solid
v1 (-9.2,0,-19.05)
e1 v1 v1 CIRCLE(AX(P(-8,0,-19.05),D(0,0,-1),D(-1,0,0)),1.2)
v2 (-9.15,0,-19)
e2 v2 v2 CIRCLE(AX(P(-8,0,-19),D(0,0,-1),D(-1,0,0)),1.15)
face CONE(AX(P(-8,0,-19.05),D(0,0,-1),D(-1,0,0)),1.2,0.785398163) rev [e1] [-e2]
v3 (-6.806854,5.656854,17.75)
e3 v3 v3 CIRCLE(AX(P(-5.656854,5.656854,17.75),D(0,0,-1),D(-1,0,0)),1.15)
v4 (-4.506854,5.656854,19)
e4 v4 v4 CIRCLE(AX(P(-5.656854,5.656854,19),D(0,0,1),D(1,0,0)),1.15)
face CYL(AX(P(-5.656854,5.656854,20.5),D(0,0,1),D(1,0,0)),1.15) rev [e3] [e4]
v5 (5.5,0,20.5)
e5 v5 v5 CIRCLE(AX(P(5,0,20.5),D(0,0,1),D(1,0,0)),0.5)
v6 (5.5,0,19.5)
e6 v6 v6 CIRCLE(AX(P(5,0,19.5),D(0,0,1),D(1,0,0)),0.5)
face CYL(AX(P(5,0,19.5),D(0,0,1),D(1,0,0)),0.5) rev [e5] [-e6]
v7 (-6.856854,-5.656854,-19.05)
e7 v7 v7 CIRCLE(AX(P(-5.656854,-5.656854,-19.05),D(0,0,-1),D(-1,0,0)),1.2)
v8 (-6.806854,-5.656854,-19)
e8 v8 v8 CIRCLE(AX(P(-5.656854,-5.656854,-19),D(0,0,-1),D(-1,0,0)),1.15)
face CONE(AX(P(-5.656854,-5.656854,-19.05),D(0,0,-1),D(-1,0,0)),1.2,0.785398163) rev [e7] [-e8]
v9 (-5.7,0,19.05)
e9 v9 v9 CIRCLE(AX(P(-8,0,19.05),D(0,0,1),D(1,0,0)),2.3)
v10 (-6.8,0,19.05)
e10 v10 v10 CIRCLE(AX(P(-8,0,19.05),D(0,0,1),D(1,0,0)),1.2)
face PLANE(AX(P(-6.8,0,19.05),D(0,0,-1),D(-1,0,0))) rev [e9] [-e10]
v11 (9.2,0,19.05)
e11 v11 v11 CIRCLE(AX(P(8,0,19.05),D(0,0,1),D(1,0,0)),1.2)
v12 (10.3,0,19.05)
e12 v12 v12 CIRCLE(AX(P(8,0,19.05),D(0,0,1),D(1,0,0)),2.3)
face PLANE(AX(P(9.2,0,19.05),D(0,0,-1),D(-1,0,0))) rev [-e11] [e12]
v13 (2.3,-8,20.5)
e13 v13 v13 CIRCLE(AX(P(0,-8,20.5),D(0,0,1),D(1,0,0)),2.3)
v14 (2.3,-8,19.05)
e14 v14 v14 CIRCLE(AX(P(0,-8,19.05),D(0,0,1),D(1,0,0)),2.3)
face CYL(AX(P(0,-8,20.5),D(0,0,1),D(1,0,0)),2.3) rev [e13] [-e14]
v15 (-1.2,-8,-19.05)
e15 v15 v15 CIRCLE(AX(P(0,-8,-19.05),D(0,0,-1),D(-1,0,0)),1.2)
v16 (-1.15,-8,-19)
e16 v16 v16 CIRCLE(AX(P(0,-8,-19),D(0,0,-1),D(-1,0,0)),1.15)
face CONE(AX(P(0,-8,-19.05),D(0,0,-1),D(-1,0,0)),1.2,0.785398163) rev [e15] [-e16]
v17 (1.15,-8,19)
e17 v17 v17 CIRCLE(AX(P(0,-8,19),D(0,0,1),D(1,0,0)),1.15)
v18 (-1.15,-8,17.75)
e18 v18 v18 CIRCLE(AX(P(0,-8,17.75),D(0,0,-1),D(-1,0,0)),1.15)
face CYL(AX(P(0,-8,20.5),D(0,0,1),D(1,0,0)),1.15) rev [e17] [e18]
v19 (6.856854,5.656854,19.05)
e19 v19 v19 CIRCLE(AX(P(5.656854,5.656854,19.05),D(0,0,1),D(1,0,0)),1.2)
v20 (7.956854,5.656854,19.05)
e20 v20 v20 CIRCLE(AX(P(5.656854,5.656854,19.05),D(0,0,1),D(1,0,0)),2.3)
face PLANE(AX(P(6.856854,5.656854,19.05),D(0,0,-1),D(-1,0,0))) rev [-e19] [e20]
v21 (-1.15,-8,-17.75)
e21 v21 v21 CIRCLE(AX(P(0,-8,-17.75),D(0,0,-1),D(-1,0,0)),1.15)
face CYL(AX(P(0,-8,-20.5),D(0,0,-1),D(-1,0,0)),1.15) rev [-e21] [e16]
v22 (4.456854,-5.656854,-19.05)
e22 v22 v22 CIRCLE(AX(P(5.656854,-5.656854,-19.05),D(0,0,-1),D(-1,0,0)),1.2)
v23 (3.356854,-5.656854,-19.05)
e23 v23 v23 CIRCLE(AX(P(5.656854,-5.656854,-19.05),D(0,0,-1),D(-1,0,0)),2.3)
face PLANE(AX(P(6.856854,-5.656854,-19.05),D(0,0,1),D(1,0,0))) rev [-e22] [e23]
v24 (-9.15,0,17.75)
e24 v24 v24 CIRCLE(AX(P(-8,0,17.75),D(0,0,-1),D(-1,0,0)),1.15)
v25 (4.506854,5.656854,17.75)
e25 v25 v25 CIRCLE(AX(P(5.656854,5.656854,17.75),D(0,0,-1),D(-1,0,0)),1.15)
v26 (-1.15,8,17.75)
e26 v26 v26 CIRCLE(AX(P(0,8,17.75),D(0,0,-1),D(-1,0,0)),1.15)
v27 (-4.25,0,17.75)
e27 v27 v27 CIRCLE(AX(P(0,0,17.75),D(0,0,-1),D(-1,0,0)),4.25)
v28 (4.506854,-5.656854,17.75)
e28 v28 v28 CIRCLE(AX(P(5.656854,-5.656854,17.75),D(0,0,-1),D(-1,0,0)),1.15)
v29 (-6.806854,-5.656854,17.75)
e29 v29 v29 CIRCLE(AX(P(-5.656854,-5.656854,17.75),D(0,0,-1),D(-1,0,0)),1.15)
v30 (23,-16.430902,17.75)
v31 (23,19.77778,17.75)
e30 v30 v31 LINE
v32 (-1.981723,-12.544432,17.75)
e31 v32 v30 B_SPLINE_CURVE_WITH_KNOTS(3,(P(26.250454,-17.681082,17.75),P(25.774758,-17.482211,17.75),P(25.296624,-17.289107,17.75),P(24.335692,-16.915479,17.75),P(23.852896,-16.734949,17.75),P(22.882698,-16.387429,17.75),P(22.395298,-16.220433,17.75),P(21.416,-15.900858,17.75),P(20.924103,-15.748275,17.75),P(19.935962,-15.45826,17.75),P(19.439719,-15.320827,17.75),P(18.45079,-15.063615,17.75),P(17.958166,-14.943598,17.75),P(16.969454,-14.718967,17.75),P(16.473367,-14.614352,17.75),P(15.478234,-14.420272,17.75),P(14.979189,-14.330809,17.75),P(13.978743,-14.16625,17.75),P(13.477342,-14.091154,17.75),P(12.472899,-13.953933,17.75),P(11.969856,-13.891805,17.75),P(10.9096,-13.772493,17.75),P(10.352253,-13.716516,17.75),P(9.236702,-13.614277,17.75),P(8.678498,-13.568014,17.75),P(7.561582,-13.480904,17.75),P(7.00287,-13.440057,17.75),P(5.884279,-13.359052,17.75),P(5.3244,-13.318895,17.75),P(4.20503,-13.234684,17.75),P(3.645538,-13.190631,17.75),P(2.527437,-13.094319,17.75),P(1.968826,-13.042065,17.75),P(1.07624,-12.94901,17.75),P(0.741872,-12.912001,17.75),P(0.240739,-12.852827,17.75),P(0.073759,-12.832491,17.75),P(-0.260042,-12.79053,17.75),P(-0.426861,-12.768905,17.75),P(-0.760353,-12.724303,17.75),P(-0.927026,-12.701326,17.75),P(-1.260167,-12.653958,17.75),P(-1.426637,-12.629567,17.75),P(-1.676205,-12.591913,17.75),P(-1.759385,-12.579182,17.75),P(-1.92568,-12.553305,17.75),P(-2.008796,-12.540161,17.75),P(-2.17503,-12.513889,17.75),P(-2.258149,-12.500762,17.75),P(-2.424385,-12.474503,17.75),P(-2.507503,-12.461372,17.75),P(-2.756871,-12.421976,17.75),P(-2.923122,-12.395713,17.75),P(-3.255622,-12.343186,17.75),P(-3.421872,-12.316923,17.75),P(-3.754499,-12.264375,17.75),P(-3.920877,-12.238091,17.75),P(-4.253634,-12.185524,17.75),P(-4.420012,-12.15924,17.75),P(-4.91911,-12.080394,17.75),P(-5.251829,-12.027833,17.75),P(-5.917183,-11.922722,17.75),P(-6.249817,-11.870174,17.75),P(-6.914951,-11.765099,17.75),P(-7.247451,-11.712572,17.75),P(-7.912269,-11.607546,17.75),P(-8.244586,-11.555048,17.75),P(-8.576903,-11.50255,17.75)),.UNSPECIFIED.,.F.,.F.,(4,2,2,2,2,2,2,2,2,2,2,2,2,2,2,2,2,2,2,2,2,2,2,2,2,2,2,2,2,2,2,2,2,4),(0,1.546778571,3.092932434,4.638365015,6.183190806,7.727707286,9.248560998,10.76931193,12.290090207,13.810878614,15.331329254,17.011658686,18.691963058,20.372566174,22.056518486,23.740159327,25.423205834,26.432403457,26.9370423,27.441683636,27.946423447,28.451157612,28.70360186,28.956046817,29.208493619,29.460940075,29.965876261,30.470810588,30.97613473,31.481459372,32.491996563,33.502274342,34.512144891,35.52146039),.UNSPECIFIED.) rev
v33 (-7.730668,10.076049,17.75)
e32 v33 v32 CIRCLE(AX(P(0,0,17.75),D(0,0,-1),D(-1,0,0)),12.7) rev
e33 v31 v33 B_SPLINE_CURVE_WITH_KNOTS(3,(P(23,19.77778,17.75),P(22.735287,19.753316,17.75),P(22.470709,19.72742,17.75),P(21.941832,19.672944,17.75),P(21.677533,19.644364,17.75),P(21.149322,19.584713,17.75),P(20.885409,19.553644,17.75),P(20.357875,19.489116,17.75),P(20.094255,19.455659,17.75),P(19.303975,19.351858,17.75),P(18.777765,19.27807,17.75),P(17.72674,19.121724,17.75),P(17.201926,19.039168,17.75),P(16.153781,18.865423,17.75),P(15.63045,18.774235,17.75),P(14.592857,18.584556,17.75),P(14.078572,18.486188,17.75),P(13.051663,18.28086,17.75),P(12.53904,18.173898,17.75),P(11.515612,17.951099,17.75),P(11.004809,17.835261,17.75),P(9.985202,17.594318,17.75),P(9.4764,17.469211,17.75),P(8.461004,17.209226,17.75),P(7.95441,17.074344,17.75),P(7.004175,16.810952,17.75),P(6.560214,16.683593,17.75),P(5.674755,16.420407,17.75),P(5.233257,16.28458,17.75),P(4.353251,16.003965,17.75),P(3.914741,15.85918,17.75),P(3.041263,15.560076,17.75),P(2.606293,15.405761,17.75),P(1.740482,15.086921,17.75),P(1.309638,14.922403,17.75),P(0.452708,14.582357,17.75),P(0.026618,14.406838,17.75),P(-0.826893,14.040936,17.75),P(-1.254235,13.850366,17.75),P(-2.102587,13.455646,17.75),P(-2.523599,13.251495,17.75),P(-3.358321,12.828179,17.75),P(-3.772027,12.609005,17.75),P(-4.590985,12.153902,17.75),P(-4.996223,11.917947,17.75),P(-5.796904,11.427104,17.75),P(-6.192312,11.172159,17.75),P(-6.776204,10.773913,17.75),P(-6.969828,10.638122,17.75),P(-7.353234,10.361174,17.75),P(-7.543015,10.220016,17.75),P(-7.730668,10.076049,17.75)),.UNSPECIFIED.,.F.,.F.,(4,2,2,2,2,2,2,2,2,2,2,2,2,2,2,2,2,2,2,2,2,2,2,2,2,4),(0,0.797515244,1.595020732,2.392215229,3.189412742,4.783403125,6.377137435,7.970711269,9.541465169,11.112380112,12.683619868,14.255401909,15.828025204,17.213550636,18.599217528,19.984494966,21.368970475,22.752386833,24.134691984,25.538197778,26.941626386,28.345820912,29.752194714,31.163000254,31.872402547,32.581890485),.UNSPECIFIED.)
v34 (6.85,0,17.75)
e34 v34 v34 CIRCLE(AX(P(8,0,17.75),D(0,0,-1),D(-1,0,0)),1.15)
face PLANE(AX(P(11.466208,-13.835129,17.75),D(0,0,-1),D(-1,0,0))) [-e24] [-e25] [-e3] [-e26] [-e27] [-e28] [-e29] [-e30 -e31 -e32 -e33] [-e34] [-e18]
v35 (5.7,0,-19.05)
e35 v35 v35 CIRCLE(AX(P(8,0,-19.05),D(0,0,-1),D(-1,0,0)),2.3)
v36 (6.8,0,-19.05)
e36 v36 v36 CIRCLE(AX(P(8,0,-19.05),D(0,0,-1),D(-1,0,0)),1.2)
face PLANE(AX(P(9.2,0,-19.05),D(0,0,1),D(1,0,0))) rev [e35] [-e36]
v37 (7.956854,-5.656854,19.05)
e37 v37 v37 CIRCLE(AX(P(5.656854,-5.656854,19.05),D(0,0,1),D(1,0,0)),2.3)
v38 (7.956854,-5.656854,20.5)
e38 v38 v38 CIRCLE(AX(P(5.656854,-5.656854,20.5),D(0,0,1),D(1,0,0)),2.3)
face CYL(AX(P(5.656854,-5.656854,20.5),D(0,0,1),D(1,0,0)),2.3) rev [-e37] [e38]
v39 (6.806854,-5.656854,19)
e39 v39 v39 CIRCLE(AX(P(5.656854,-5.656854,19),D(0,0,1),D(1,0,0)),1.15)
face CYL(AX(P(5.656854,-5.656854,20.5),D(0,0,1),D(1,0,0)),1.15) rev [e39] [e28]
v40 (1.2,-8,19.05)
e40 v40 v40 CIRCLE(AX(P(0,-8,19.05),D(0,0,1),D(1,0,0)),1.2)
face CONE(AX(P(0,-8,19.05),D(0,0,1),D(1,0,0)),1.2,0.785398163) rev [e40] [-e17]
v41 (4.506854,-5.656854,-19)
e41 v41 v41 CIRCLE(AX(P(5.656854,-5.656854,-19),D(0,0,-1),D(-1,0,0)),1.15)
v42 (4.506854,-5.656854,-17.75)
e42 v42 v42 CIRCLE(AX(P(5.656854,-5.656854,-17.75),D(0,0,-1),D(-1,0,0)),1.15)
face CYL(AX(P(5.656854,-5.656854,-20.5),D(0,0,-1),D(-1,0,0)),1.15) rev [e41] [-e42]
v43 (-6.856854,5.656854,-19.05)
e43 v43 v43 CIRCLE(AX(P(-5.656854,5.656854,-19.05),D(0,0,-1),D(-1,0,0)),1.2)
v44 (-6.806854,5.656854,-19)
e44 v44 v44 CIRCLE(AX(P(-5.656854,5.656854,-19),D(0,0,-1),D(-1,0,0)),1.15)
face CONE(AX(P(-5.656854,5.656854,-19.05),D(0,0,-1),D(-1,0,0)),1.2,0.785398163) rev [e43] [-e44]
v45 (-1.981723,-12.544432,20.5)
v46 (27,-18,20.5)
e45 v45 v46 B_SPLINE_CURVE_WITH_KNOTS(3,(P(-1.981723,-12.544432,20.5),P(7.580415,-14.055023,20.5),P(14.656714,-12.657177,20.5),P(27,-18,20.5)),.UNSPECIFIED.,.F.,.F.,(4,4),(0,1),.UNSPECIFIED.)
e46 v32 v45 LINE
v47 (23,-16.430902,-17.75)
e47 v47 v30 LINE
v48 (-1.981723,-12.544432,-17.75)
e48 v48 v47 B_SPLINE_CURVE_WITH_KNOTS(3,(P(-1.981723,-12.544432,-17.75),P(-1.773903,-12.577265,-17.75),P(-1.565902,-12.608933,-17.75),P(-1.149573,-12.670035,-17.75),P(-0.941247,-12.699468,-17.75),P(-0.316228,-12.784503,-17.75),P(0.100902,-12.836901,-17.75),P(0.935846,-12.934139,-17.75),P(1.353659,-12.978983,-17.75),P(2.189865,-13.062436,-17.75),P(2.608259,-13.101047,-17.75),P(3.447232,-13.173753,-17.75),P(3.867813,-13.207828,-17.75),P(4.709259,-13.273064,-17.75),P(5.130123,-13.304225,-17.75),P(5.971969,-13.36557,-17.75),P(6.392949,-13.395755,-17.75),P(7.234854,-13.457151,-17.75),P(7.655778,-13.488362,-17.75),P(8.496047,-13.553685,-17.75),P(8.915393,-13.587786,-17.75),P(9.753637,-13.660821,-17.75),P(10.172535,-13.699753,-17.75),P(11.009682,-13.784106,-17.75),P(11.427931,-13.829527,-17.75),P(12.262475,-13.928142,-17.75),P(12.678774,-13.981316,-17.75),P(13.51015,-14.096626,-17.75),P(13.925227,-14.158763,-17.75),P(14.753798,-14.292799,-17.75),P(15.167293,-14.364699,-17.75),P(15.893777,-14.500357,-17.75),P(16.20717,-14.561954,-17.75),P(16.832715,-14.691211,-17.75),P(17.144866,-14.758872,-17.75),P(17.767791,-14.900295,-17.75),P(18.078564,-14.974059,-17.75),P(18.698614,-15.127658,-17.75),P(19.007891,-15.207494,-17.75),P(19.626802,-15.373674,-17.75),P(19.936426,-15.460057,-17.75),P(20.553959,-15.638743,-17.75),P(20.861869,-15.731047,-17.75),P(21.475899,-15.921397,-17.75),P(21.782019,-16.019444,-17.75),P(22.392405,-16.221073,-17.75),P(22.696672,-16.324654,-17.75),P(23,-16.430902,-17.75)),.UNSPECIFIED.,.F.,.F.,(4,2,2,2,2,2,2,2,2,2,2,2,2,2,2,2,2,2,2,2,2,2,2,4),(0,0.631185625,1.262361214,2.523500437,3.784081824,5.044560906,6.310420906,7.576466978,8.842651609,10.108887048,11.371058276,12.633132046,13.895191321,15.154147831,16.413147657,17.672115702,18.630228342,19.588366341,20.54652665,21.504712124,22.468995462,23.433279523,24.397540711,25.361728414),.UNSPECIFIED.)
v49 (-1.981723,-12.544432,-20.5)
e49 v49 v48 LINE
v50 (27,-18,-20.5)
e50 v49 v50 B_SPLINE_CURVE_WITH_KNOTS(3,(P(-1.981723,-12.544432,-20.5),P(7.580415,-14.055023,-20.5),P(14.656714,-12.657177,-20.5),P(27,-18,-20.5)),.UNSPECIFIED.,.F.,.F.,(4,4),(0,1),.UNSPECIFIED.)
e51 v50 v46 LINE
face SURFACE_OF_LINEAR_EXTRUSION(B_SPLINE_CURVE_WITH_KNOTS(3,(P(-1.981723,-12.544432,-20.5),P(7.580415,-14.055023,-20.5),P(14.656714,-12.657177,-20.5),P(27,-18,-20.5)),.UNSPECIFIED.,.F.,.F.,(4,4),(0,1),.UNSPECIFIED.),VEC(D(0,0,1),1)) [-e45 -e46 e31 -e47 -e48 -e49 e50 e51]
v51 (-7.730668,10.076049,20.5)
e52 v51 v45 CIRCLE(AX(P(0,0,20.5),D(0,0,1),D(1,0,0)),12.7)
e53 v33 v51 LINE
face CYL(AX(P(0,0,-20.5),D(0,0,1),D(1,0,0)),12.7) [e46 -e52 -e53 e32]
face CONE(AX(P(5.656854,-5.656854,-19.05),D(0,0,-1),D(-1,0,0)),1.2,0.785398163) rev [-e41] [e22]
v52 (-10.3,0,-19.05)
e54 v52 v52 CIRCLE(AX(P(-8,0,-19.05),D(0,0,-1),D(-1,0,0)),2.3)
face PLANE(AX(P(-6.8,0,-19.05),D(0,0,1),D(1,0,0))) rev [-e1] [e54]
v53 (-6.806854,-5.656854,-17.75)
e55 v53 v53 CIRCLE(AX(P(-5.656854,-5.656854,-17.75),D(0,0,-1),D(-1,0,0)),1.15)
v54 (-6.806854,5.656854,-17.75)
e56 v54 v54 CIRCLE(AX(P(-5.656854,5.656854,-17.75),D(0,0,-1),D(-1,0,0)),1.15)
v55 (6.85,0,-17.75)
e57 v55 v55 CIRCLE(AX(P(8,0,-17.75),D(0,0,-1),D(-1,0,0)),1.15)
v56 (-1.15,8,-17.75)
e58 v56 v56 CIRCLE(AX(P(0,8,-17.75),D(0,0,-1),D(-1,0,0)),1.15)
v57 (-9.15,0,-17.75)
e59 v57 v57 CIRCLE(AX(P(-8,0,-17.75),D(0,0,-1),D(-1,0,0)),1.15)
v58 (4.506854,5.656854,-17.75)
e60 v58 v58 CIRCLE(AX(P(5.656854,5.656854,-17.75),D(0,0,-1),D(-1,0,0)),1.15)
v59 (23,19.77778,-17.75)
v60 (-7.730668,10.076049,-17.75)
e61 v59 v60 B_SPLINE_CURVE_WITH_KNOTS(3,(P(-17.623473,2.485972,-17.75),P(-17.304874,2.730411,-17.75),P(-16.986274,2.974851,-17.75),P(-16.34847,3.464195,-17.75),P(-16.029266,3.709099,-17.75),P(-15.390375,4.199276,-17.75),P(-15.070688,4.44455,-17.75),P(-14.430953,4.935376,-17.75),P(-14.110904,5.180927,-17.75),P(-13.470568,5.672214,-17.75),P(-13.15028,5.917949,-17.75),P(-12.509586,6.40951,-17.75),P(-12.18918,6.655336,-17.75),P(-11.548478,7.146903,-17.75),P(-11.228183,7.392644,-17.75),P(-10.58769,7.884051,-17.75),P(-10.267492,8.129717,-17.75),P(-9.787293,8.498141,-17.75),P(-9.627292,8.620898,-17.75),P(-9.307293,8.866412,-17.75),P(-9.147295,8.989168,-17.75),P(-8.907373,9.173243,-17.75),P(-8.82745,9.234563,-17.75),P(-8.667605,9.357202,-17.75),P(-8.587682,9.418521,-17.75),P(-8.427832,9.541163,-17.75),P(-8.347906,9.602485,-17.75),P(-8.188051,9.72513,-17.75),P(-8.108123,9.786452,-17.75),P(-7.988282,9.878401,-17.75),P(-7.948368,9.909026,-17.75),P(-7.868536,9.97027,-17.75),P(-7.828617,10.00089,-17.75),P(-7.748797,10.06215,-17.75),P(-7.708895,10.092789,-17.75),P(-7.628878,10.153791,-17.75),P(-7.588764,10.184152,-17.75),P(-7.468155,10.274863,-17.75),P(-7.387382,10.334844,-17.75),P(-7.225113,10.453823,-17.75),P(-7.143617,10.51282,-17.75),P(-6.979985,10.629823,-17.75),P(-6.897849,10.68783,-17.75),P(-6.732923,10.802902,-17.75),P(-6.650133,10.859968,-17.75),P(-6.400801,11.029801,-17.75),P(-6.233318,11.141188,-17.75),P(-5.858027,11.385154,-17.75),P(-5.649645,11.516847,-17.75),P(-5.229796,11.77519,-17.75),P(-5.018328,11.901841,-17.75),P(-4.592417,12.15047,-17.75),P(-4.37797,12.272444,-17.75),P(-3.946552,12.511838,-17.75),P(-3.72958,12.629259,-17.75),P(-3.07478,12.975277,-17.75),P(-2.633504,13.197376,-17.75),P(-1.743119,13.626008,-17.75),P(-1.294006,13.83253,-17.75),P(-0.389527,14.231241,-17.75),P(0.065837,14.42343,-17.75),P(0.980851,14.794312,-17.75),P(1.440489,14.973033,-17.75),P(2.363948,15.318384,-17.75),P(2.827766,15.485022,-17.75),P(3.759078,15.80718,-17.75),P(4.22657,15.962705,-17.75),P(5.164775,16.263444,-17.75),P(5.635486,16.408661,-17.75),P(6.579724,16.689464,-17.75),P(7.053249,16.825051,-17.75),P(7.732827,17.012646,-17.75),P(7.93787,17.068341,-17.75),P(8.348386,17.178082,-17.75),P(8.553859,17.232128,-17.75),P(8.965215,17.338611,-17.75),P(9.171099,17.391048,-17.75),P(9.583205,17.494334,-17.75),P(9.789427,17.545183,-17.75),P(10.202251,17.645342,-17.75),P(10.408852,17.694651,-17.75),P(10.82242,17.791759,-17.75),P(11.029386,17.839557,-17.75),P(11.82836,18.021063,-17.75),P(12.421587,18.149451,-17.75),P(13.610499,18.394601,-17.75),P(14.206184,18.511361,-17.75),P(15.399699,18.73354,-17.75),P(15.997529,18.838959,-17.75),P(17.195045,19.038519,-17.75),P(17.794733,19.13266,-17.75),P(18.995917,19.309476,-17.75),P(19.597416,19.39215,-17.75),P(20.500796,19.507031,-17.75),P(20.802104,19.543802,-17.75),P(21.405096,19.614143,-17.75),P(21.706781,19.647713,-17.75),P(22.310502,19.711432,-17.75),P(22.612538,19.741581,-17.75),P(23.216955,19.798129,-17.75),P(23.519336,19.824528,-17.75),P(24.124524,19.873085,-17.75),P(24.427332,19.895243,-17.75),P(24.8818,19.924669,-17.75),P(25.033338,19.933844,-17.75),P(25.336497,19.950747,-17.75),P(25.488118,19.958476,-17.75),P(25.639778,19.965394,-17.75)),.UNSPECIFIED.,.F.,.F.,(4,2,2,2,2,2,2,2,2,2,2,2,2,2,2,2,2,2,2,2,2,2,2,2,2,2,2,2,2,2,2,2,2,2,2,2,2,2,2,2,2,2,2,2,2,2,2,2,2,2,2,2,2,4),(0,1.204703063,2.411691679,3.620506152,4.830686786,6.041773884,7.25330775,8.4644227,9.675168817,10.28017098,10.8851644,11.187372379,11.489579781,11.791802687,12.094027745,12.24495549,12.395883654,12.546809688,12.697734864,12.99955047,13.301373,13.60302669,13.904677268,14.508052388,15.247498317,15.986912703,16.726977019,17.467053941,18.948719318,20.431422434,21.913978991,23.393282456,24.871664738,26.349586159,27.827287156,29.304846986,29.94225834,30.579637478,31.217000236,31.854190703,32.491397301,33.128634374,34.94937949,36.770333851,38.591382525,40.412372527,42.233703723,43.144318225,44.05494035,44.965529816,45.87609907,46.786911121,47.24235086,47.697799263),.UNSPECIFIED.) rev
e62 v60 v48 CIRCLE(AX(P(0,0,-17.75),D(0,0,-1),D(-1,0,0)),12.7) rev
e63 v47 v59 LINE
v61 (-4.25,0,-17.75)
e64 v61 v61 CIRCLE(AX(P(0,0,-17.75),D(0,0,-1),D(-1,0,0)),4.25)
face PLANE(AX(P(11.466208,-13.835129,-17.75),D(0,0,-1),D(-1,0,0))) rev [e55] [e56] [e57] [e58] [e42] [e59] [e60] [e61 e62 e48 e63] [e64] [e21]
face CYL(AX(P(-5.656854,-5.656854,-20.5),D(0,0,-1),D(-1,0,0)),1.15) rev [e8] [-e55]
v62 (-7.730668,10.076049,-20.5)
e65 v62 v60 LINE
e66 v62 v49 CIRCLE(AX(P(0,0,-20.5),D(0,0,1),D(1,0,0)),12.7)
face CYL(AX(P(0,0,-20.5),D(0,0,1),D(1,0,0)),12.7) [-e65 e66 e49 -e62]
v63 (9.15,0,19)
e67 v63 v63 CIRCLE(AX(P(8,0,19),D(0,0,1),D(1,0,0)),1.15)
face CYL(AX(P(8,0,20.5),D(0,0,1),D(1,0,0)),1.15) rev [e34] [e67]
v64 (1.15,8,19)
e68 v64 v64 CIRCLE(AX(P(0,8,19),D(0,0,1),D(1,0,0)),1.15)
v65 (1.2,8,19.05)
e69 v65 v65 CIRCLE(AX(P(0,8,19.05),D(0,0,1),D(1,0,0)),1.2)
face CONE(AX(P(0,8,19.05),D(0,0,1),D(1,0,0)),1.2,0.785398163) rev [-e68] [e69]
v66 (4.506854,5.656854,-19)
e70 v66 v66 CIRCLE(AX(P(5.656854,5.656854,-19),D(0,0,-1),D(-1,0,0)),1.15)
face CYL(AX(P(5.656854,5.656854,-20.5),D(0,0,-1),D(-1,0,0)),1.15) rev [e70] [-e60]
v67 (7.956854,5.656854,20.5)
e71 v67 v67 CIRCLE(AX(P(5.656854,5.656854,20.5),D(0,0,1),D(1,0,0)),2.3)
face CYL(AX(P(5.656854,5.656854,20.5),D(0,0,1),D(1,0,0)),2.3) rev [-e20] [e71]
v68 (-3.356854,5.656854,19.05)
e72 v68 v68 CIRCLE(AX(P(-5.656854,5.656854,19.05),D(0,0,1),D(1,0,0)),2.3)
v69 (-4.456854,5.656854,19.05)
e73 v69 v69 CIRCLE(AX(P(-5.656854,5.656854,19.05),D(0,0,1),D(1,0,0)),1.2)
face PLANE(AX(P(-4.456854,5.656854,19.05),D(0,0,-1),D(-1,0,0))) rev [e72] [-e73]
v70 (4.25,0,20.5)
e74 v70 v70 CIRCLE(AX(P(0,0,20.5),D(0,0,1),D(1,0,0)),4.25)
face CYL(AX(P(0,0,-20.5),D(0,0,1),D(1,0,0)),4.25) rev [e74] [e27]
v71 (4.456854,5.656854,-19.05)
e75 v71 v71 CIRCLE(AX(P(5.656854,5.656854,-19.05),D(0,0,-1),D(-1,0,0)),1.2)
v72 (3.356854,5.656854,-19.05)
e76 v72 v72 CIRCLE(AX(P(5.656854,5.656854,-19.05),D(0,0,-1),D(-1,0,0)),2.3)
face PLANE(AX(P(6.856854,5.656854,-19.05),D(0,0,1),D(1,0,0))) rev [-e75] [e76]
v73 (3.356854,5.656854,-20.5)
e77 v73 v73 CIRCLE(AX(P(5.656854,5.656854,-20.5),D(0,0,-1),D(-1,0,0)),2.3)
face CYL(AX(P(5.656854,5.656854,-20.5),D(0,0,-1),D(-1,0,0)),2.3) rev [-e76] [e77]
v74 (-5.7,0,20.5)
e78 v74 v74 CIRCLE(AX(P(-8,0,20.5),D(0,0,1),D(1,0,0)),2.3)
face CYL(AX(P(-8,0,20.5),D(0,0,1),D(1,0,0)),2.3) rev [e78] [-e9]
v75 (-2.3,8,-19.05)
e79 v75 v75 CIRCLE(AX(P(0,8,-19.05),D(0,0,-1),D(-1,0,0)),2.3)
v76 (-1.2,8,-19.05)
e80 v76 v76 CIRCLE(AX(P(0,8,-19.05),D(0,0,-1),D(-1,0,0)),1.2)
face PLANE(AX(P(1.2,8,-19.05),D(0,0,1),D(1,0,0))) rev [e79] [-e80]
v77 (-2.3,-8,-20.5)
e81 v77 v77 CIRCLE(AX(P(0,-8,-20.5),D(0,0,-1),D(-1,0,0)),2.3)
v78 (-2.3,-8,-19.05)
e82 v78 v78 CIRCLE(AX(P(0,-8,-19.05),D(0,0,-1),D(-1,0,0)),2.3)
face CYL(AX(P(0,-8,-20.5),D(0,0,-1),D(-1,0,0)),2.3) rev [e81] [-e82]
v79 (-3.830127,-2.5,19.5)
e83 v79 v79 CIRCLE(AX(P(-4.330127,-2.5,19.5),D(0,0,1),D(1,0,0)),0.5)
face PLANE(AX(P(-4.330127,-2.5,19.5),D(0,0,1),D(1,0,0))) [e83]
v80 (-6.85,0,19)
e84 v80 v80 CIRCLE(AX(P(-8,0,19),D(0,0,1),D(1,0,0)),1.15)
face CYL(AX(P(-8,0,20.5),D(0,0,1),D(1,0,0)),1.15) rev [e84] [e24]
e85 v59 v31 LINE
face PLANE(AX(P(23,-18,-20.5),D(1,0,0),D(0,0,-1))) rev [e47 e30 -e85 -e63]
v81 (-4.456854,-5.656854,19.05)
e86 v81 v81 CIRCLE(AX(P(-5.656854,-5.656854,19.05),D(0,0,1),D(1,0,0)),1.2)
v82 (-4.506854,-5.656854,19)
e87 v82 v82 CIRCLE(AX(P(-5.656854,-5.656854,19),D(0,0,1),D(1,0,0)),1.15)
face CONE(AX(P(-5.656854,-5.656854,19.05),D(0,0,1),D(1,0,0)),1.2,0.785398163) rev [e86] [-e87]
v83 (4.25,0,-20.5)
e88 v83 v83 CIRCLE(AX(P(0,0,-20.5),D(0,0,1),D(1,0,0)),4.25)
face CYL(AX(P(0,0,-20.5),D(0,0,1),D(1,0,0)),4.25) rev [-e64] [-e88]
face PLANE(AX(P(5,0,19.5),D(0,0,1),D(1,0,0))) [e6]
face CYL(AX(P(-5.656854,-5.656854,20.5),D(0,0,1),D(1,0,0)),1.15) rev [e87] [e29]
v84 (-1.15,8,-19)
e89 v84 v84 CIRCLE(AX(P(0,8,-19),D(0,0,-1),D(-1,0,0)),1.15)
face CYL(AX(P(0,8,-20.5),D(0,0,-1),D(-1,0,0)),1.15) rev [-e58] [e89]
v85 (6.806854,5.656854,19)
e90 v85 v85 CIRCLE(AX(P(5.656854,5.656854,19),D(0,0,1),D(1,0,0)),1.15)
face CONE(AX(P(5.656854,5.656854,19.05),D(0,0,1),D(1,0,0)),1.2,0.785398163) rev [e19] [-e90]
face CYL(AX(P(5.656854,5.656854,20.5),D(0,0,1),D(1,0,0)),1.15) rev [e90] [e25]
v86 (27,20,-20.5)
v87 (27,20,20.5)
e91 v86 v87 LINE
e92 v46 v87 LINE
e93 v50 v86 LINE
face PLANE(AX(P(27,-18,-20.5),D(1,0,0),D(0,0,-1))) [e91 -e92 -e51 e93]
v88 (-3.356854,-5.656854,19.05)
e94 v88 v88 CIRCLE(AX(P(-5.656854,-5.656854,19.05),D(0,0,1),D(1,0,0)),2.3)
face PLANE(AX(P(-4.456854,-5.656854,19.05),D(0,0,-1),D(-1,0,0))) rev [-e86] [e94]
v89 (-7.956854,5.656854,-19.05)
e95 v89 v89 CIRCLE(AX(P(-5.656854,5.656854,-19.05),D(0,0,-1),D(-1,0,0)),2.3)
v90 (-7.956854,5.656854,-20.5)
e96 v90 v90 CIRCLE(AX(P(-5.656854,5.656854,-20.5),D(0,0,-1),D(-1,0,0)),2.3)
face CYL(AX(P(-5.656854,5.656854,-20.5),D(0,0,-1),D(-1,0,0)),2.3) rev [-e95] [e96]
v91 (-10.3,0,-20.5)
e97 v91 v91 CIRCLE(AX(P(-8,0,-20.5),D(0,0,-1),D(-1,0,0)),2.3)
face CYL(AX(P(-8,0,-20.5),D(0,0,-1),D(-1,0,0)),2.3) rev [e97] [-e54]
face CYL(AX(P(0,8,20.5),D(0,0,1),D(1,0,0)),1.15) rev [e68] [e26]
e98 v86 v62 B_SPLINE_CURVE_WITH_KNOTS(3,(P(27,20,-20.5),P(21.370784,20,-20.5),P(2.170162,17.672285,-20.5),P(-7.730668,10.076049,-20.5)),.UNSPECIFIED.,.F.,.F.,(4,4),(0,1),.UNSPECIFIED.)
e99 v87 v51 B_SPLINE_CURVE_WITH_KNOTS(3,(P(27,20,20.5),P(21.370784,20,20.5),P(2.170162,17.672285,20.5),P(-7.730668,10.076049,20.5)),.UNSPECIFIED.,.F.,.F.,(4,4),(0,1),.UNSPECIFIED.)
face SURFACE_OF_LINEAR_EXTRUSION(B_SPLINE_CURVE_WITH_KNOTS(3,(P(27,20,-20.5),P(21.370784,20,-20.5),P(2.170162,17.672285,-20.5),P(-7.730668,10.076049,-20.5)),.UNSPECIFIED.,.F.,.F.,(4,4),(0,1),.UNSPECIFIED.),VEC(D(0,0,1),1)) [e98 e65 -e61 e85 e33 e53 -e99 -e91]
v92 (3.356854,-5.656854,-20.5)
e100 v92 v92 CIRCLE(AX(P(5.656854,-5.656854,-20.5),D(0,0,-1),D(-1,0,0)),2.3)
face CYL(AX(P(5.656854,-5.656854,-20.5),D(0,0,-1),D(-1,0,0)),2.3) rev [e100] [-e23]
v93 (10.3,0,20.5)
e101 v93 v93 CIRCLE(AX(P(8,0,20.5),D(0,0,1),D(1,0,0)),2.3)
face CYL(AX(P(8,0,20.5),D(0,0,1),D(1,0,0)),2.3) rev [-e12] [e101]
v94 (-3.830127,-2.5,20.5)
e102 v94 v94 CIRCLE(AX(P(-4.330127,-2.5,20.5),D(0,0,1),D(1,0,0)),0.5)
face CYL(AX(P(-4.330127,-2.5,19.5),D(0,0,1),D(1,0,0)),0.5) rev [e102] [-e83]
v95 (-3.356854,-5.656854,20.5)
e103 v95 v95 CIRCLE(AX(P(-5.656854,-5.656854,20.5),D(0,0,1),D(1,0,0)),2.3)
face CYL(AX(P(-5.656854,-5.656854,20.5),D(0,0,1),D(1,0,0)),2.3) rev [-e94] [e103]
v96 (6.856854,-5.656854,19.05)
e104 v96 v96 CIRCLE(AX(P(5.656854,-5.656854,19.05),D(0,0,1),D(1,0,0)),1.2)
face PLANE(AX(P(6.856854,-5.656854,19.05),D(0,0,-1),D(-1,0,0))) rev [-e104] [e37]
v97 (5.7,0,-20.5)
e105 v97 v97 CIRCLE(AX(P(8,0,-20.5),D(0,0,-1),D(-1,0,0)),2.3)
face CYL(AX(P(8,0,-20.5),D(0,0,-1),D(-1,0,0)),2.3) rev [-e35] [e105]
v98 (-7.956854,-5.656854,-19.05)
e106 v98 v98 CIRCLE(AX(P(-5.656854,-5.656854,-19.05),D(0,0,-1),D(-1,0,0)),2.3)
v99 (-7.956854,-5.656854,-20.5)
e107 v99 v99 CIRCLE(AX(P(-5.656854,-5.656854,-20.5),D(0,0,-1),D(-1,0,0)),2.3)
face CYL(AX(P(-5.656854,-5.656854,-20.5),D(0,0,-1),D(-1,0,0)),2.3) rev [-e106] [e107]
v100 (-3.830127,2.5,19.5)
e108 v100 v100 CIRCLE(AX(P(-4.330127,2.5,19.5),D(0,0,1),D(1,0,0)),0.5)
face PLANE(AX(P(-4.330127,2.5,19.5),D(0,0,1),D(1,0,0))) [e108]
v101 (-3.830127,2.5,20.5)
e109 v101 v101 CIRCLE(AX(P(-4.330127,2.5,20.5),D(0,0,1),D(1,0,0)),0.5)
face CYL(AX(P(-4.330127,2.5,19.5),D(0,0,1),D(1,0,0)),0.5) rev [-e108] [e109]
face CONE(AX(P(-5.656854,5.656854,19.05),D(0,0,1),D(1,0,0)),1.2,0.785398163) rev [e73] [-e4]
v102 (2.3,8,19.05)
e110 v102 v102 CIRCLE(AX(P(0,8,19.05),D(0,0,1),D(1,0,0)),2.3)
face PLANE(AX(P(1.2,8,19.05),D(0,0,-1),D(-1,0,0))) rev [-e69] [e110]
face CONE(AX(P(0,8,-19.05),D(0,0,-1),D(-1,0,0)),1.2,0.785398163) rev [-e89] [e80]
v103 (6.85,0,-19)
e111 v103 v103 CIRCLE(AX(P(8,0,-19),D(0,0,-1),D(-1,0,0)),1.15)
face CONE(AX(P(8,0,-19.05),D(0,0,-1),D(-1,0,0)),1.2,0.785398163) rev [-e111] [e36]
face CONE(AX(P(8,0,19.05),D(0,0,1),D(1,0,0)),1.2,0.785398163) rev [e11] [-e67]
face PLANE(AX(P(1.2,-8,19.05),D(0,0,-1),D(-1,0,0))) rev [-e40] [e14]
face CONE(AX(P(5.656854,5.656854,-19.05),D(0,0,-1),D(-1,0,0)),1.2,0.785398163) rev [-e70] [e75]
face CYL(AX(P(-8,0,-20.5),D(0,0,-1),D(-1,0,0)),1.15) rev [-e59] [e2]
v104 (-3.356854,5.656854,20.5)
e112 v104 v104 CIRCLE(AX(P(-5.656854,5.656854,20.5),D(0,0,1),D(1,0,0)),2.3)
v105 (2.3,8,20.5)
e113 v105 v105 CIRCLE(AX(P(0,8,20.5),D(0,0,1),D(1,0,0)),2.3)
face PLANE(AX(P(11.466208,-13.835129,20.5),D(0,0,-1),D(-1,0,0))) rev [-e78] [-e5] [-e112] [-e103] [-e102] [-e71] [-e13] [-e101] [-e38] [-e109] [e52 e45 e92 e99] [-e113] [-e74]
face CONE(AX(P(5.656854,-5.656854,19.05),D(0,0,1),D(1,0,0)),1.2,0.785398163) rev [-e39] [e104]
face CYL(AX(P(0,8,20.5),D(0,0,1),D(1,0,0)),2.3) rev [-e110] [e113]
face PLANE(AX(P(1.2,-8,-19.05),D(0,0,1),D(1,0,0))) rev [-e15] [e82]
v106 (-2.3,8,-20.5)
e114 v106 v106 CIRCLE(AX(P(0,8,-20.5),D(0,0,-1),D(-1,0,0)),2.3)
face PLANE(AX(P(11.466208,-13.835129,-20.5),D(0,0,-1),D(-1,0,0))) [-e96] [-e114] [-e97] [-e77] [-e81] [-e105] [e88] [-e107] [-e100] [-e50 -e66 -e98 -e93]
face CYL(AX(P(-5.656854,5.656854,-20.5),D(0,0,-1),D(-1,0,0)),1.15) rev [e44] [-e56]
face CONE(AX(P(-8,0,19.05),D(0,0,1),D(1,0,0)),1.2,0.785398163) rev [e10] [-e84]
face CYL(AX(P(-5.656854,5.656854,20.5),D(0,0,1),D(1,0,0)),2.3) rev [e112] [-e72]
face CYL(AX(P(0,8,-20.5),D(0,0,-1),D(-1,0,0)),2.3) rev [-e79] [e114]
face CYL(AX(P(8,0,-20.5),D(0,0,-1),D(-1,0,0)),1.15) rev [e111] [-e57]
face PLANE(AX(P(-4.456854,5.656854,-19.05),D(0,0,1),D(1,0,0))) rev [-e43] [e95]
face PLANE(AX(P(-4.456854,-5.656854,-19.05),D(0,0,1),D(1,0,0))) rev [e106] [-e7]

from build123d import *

# Parameters (mm, degrees)
BOSS_EXTRUDE1_DEPTH      = 20.5
SHELL1_START             = -12.7000001
SHELL1_OUTLINE_W         = 39
SHELL1_OUTLINE_H         = 35.5
SHELL1_DEPTH             = 35.7000001
SKETCH27_R               = 0.5
CUT_EXTRUDE10_DEPTH      = 1
CUT_EXTRUDE17_DEPTH      = 40.36051338
CUT_EXTRUDE17_DEPTH_BACK = 40.36051338
SKETCH35_R               = 4.25


# Read off the part's stored shape, not the designer's step: Shell1, CBORE for M2 Hex Socket Head Cap Screw2
with BuildPart() as part:
    # Sketch4 → Boss-Extrude1 (new, symmetric)
    with BuildSketch(Plane.XY):
        with BuildLine():
            Line((27, -18), (27, 20))
            add(Edge.make_bspline(
                [(-7.730668476, 10.076049072), (2.170162487, 17.672284588), (21.370784375, 20), (27, 20)],
                knots=[0, 0, 0, 0, 1, 1, 1, 1], degree=3))
            ThreePointArc((-7.730668476, 10.076049072), (-12.308703382, -3.128229699), (-1.981723336, -12.544431937))
            add(Edge.make_bspline(
                [(-1.981723336, -12.544431937), (7.580415063, -14.055023481), (14.656713895, -12.657176609), (27, -18)],
                knots=[0, 0, 0, 0, 1, 1, 1, 1], degree=3))
        make_face()
    extrude(amount=BOSS_EXTRUDE1_DEPTH, both=True)

    # Shell1 outline → Shell1 (cut)
    with BuildSketch(Plane.YZ.offset(SHELL1_START)):
        with Locations((1.5, 0)):
            Rectangle(SHELL1_OUTLINE_W, SHELL1_OUTLINE_H)
    extrude(amount=SHELL1_DEPTH, mode=Mode.SUBTRACT)

    # CBORE for M2 Hex Socket Head Cap Scr 2 → CBORE for M2 Hex Socket Head Cap Screw2 (revolve, cut)
    with BuildSketch(Plane(origin=(-5.656854249, -5.656854249, 0), x_dir=(1, 0, 0), z_dir=(0, -1, 0))):
        Polygon((0, 17.75), (1.15, 17.75), (1.15, 19), (1.2, 19.05), (2.3, 19.05), (2.3, 20.5), (0, 20.5), align=None)
    cbore_for_m2_hex_socket_head_cap_screw2 = revolve(axis=Axis((-5.656854249, -5.656854249, 0), (0, 0, 1)), mode=Mode.SUBTRACT)

    # CBORE for M2 Hex Socket Head Cap Scr 3 o → CBORE for M2 Hex Socket Head Cap Scr 3 (revolve, cut)
    with BuildSketch(Plane(origin=(-8, 0, 0), x_dir=(1, 0, 0), z_dir=(0, -1, 0))):
        Polygon((1.15, 19), (1.2, 19.05), (2.3, 19.05), (2.3, 20.5), (0, 20.5), (0, 17.75), (1.15, 17.75), align=None)
    cbore_for_m2_hex_socket_head_cap_scr_3 = revolve(axis=Axis((-8, 0, 0), (0, 0, 1)), mode=Mode.SUBTRACT)

    # CBORE for M2 Hex Socket Head Cap Scr 4 o → CBORE for M2 Hex Socket Head Cap Scr 4 (revolve, cut)
    with BuildSketch(Plane(origin=(-5.656854249, 5.656854249, 0), x_dir=(1, 0, 0), z_dir=(0, -1, 0))):
        Polygon((1.15, 19), (1.2, 19.05), (2.3, 19.05), (2.3, 20.5), (0, 20.5), (0, 17.75), (1.15, 17.75), align=None)
    cbore_for_m2_hex_socket_head_cap_scr_4 = revolve(axis=Axis((-5.656854249, 5.656854249, 0), (0, 0, 1)), mode=Mode.SUBTRACT)

    # CBORE for M2 Hex Socket Head Cap Scr 5 o → CBORE for M2 Hex Socket Head Cap Scr 5 (revolve, cut)
    with BuildSketch(Plane(origin=(8, 0, 0), x_dir=(1, 0, 0), z_dir=(0, -1, 0))):
        Polygon((1.15, 19), (1.2, 19.05), (2.3, 19.05), (2.3, 20.5), (0, 20.5), (0, 17.75), (1.15, 17.75), align=None)
    cbore_for_m2_hex_socket_head_cap_scr_5 = revolve(axis=Axis((8, 0, 0), (0, 0, 1)), mode=Mode.SUBTRACT)

    # CBORE for M2 Hex Socket Head Cap Scr 6 o → CBORE for M2 Hex Socket Head Cap Scr 6 (revolve, cut)
    with BuildSketch(Plane(origin=(5.656854249, -5.656854249, 0), x_dir=(1, 0, 0), z_dir=(0, -1, 0))):
        Polygon((1.15, 19), (1.2, 19.05), (2.3, 19.05), (2.3, 20.5), (0, 20.5), (0, 17.75), (1.15, 17.75), align=None)
    cbore_for_m2_hex_socket_head_cap_scr_6 = revolve(axis=Axis((5.656854249, -5.656854249, 0), (0, 0, 1)), mode=Mode.SUBTRACT)

    # CBORE for M2 Hex Socket Head Cap Scr 7 o → CBORE for M2 Hex Socket Head Cap Scr 7 (revolve, cut)
    with BuildSketch(Plane.XZ.offset(8)):
        Polygon((1.15, 19), (1.2, 19.05), (2.3, 19.05), (2.3, 20.5), (0, 20.5), (0, 17.75), (1.15, 17.75), align=None)
    cbore_for_m2_hex_socket_head_cap_scr_7 = revolve(axis=Axis((0, -8, 0), (0, 0, 1)), mode=Mode.SUBTRACT)

    # CBORE for M2 Hex Socket Head Cap Scr 8 o → CBORE for M2 Hex Socket Head Cap Scr 8 (revolve, cut)
    with BuildSketch(Plane.XZ.offset(-8)):
        Polygon((1.15, 19), (1.2, 19.05), (2.3, 19.05), (2.3, 20.5), (0, 20.5), (0, 17.75), (1.15, 17.75), align=None)
    cbore_for_m2_hex_socket_head_cap_scr_8 = revolve(axis=Axis((0, 8, 0), (0, 0, 1)), mode=Mode.SUBTRACT)

    # CBORE for M2 Hex Socket Head Cap Scr 9 o → CBORE for M2 Hex Socket Head Cap Scr 9 (revolve, cut)
    with BuildSketch(Plane(origin=(5.656854249, 5.656854249, 0), x_dir=(1, 0, 0), z_dir=(0, -1, 0))):
        Polygon((1.15, 19), (1.2, 19.05), (2.3, 19.05), (2.3, 20.5), (0, 20.5), (0, 17.75), (1.15, 17.75), align=None)
    cbore_for_m2_hex_socket_head_cap_scr_9 = revolve(axis=Axis((5.656854249, 5.656854249, 0), (0, 0, 1)), mode=Mode.SUBTRACT)

    # Sketch27 → Cut-Extrude10 (cut)
    with BuildSketch(Plane.XY.offset(20.5)):
        with Locations((-4.330127019, -2.5)):
            Circle(SKETCH27_R)
        with Locations((-4.330127019, 2.5)):
            Circle(SKETCH27_R)
        with Locations((5, 0)):
            Circle(SKETCH27_R)
    extrude(amount=-CUT_EXTRUDE10_DEPTH, mode=Mode.SUBTRACT)

    # Mirror2: CBORE for M2 Hex Socket Head Cap Screw2, CBORE for M2 Hex Socket Head Cap Scr 3, CBORE for M2 Hex Socket Head Cap Scr 4, CBORE for M2 Hex Socket Head Cap Scr 5, CBORE for M2 Hex Socket Head Cap Scr 6, CBORE for M2 Hex Socket Head Cap Scr 7, CBORE for M2 Hex Socket Head Cap Scr 8, CBORE for M2 Hex Socket Head Cap Scr 9 across plane
    add(cbore_for_m2_hex_socket_head_cap_screw2.mirror(Plane.XY), mode=Mode.SUBTRACT)
    add(cbore_for_m2_hex_socket_head_cap_scr_3.mirror(Plane.XY), mode=Mode.SUBTRACT)
    add(cbore_for_m2_hex_socket_head_cap_scr_4.mirror(Plane.XY), mode=Mode.SUBTRACT)
    add(cbore_for_m2_hex_socket_head_cap_scr_5.mirror(Plane.XY), mode=Mode.SUBTRACT)
    add(cbore_for_m2_hex_socket_head_cap_scr_6.mirror(Plane.XY), mode=Mode.SUBTRACT)
    add(cbore_for_m2_hex_socket_head_cap_scr_7.mirror(Plane.XY), mode=Mode.SUBTRACT)
    add(cbore_for_m2_hex_socket_head_cap_scr_8.mirror(Plane.XY), mode=Mode.SUBTRACT)
    add(cbore_for_m2_hex_socket_head_cap_scr_9.mirror(Plane.XY), mode=Mode.SUBTRACT)

    # Sketch35 → Cut-Extrude17 (cut, two sides: drawn at the far end of the back side and taken through both)
    with BuildSketch(Plane.XY.offset(-CUT_EXTRUDE17_DEPTH_BACK)):
        Circle(SKETCH35_R)
    extrude(amount=CUT_EXTRUDE17_DEPTH + CUT_EXTRUDE17_DEPTH_BACK, mode=Mode.SUBTRACT)


solid = part.part
